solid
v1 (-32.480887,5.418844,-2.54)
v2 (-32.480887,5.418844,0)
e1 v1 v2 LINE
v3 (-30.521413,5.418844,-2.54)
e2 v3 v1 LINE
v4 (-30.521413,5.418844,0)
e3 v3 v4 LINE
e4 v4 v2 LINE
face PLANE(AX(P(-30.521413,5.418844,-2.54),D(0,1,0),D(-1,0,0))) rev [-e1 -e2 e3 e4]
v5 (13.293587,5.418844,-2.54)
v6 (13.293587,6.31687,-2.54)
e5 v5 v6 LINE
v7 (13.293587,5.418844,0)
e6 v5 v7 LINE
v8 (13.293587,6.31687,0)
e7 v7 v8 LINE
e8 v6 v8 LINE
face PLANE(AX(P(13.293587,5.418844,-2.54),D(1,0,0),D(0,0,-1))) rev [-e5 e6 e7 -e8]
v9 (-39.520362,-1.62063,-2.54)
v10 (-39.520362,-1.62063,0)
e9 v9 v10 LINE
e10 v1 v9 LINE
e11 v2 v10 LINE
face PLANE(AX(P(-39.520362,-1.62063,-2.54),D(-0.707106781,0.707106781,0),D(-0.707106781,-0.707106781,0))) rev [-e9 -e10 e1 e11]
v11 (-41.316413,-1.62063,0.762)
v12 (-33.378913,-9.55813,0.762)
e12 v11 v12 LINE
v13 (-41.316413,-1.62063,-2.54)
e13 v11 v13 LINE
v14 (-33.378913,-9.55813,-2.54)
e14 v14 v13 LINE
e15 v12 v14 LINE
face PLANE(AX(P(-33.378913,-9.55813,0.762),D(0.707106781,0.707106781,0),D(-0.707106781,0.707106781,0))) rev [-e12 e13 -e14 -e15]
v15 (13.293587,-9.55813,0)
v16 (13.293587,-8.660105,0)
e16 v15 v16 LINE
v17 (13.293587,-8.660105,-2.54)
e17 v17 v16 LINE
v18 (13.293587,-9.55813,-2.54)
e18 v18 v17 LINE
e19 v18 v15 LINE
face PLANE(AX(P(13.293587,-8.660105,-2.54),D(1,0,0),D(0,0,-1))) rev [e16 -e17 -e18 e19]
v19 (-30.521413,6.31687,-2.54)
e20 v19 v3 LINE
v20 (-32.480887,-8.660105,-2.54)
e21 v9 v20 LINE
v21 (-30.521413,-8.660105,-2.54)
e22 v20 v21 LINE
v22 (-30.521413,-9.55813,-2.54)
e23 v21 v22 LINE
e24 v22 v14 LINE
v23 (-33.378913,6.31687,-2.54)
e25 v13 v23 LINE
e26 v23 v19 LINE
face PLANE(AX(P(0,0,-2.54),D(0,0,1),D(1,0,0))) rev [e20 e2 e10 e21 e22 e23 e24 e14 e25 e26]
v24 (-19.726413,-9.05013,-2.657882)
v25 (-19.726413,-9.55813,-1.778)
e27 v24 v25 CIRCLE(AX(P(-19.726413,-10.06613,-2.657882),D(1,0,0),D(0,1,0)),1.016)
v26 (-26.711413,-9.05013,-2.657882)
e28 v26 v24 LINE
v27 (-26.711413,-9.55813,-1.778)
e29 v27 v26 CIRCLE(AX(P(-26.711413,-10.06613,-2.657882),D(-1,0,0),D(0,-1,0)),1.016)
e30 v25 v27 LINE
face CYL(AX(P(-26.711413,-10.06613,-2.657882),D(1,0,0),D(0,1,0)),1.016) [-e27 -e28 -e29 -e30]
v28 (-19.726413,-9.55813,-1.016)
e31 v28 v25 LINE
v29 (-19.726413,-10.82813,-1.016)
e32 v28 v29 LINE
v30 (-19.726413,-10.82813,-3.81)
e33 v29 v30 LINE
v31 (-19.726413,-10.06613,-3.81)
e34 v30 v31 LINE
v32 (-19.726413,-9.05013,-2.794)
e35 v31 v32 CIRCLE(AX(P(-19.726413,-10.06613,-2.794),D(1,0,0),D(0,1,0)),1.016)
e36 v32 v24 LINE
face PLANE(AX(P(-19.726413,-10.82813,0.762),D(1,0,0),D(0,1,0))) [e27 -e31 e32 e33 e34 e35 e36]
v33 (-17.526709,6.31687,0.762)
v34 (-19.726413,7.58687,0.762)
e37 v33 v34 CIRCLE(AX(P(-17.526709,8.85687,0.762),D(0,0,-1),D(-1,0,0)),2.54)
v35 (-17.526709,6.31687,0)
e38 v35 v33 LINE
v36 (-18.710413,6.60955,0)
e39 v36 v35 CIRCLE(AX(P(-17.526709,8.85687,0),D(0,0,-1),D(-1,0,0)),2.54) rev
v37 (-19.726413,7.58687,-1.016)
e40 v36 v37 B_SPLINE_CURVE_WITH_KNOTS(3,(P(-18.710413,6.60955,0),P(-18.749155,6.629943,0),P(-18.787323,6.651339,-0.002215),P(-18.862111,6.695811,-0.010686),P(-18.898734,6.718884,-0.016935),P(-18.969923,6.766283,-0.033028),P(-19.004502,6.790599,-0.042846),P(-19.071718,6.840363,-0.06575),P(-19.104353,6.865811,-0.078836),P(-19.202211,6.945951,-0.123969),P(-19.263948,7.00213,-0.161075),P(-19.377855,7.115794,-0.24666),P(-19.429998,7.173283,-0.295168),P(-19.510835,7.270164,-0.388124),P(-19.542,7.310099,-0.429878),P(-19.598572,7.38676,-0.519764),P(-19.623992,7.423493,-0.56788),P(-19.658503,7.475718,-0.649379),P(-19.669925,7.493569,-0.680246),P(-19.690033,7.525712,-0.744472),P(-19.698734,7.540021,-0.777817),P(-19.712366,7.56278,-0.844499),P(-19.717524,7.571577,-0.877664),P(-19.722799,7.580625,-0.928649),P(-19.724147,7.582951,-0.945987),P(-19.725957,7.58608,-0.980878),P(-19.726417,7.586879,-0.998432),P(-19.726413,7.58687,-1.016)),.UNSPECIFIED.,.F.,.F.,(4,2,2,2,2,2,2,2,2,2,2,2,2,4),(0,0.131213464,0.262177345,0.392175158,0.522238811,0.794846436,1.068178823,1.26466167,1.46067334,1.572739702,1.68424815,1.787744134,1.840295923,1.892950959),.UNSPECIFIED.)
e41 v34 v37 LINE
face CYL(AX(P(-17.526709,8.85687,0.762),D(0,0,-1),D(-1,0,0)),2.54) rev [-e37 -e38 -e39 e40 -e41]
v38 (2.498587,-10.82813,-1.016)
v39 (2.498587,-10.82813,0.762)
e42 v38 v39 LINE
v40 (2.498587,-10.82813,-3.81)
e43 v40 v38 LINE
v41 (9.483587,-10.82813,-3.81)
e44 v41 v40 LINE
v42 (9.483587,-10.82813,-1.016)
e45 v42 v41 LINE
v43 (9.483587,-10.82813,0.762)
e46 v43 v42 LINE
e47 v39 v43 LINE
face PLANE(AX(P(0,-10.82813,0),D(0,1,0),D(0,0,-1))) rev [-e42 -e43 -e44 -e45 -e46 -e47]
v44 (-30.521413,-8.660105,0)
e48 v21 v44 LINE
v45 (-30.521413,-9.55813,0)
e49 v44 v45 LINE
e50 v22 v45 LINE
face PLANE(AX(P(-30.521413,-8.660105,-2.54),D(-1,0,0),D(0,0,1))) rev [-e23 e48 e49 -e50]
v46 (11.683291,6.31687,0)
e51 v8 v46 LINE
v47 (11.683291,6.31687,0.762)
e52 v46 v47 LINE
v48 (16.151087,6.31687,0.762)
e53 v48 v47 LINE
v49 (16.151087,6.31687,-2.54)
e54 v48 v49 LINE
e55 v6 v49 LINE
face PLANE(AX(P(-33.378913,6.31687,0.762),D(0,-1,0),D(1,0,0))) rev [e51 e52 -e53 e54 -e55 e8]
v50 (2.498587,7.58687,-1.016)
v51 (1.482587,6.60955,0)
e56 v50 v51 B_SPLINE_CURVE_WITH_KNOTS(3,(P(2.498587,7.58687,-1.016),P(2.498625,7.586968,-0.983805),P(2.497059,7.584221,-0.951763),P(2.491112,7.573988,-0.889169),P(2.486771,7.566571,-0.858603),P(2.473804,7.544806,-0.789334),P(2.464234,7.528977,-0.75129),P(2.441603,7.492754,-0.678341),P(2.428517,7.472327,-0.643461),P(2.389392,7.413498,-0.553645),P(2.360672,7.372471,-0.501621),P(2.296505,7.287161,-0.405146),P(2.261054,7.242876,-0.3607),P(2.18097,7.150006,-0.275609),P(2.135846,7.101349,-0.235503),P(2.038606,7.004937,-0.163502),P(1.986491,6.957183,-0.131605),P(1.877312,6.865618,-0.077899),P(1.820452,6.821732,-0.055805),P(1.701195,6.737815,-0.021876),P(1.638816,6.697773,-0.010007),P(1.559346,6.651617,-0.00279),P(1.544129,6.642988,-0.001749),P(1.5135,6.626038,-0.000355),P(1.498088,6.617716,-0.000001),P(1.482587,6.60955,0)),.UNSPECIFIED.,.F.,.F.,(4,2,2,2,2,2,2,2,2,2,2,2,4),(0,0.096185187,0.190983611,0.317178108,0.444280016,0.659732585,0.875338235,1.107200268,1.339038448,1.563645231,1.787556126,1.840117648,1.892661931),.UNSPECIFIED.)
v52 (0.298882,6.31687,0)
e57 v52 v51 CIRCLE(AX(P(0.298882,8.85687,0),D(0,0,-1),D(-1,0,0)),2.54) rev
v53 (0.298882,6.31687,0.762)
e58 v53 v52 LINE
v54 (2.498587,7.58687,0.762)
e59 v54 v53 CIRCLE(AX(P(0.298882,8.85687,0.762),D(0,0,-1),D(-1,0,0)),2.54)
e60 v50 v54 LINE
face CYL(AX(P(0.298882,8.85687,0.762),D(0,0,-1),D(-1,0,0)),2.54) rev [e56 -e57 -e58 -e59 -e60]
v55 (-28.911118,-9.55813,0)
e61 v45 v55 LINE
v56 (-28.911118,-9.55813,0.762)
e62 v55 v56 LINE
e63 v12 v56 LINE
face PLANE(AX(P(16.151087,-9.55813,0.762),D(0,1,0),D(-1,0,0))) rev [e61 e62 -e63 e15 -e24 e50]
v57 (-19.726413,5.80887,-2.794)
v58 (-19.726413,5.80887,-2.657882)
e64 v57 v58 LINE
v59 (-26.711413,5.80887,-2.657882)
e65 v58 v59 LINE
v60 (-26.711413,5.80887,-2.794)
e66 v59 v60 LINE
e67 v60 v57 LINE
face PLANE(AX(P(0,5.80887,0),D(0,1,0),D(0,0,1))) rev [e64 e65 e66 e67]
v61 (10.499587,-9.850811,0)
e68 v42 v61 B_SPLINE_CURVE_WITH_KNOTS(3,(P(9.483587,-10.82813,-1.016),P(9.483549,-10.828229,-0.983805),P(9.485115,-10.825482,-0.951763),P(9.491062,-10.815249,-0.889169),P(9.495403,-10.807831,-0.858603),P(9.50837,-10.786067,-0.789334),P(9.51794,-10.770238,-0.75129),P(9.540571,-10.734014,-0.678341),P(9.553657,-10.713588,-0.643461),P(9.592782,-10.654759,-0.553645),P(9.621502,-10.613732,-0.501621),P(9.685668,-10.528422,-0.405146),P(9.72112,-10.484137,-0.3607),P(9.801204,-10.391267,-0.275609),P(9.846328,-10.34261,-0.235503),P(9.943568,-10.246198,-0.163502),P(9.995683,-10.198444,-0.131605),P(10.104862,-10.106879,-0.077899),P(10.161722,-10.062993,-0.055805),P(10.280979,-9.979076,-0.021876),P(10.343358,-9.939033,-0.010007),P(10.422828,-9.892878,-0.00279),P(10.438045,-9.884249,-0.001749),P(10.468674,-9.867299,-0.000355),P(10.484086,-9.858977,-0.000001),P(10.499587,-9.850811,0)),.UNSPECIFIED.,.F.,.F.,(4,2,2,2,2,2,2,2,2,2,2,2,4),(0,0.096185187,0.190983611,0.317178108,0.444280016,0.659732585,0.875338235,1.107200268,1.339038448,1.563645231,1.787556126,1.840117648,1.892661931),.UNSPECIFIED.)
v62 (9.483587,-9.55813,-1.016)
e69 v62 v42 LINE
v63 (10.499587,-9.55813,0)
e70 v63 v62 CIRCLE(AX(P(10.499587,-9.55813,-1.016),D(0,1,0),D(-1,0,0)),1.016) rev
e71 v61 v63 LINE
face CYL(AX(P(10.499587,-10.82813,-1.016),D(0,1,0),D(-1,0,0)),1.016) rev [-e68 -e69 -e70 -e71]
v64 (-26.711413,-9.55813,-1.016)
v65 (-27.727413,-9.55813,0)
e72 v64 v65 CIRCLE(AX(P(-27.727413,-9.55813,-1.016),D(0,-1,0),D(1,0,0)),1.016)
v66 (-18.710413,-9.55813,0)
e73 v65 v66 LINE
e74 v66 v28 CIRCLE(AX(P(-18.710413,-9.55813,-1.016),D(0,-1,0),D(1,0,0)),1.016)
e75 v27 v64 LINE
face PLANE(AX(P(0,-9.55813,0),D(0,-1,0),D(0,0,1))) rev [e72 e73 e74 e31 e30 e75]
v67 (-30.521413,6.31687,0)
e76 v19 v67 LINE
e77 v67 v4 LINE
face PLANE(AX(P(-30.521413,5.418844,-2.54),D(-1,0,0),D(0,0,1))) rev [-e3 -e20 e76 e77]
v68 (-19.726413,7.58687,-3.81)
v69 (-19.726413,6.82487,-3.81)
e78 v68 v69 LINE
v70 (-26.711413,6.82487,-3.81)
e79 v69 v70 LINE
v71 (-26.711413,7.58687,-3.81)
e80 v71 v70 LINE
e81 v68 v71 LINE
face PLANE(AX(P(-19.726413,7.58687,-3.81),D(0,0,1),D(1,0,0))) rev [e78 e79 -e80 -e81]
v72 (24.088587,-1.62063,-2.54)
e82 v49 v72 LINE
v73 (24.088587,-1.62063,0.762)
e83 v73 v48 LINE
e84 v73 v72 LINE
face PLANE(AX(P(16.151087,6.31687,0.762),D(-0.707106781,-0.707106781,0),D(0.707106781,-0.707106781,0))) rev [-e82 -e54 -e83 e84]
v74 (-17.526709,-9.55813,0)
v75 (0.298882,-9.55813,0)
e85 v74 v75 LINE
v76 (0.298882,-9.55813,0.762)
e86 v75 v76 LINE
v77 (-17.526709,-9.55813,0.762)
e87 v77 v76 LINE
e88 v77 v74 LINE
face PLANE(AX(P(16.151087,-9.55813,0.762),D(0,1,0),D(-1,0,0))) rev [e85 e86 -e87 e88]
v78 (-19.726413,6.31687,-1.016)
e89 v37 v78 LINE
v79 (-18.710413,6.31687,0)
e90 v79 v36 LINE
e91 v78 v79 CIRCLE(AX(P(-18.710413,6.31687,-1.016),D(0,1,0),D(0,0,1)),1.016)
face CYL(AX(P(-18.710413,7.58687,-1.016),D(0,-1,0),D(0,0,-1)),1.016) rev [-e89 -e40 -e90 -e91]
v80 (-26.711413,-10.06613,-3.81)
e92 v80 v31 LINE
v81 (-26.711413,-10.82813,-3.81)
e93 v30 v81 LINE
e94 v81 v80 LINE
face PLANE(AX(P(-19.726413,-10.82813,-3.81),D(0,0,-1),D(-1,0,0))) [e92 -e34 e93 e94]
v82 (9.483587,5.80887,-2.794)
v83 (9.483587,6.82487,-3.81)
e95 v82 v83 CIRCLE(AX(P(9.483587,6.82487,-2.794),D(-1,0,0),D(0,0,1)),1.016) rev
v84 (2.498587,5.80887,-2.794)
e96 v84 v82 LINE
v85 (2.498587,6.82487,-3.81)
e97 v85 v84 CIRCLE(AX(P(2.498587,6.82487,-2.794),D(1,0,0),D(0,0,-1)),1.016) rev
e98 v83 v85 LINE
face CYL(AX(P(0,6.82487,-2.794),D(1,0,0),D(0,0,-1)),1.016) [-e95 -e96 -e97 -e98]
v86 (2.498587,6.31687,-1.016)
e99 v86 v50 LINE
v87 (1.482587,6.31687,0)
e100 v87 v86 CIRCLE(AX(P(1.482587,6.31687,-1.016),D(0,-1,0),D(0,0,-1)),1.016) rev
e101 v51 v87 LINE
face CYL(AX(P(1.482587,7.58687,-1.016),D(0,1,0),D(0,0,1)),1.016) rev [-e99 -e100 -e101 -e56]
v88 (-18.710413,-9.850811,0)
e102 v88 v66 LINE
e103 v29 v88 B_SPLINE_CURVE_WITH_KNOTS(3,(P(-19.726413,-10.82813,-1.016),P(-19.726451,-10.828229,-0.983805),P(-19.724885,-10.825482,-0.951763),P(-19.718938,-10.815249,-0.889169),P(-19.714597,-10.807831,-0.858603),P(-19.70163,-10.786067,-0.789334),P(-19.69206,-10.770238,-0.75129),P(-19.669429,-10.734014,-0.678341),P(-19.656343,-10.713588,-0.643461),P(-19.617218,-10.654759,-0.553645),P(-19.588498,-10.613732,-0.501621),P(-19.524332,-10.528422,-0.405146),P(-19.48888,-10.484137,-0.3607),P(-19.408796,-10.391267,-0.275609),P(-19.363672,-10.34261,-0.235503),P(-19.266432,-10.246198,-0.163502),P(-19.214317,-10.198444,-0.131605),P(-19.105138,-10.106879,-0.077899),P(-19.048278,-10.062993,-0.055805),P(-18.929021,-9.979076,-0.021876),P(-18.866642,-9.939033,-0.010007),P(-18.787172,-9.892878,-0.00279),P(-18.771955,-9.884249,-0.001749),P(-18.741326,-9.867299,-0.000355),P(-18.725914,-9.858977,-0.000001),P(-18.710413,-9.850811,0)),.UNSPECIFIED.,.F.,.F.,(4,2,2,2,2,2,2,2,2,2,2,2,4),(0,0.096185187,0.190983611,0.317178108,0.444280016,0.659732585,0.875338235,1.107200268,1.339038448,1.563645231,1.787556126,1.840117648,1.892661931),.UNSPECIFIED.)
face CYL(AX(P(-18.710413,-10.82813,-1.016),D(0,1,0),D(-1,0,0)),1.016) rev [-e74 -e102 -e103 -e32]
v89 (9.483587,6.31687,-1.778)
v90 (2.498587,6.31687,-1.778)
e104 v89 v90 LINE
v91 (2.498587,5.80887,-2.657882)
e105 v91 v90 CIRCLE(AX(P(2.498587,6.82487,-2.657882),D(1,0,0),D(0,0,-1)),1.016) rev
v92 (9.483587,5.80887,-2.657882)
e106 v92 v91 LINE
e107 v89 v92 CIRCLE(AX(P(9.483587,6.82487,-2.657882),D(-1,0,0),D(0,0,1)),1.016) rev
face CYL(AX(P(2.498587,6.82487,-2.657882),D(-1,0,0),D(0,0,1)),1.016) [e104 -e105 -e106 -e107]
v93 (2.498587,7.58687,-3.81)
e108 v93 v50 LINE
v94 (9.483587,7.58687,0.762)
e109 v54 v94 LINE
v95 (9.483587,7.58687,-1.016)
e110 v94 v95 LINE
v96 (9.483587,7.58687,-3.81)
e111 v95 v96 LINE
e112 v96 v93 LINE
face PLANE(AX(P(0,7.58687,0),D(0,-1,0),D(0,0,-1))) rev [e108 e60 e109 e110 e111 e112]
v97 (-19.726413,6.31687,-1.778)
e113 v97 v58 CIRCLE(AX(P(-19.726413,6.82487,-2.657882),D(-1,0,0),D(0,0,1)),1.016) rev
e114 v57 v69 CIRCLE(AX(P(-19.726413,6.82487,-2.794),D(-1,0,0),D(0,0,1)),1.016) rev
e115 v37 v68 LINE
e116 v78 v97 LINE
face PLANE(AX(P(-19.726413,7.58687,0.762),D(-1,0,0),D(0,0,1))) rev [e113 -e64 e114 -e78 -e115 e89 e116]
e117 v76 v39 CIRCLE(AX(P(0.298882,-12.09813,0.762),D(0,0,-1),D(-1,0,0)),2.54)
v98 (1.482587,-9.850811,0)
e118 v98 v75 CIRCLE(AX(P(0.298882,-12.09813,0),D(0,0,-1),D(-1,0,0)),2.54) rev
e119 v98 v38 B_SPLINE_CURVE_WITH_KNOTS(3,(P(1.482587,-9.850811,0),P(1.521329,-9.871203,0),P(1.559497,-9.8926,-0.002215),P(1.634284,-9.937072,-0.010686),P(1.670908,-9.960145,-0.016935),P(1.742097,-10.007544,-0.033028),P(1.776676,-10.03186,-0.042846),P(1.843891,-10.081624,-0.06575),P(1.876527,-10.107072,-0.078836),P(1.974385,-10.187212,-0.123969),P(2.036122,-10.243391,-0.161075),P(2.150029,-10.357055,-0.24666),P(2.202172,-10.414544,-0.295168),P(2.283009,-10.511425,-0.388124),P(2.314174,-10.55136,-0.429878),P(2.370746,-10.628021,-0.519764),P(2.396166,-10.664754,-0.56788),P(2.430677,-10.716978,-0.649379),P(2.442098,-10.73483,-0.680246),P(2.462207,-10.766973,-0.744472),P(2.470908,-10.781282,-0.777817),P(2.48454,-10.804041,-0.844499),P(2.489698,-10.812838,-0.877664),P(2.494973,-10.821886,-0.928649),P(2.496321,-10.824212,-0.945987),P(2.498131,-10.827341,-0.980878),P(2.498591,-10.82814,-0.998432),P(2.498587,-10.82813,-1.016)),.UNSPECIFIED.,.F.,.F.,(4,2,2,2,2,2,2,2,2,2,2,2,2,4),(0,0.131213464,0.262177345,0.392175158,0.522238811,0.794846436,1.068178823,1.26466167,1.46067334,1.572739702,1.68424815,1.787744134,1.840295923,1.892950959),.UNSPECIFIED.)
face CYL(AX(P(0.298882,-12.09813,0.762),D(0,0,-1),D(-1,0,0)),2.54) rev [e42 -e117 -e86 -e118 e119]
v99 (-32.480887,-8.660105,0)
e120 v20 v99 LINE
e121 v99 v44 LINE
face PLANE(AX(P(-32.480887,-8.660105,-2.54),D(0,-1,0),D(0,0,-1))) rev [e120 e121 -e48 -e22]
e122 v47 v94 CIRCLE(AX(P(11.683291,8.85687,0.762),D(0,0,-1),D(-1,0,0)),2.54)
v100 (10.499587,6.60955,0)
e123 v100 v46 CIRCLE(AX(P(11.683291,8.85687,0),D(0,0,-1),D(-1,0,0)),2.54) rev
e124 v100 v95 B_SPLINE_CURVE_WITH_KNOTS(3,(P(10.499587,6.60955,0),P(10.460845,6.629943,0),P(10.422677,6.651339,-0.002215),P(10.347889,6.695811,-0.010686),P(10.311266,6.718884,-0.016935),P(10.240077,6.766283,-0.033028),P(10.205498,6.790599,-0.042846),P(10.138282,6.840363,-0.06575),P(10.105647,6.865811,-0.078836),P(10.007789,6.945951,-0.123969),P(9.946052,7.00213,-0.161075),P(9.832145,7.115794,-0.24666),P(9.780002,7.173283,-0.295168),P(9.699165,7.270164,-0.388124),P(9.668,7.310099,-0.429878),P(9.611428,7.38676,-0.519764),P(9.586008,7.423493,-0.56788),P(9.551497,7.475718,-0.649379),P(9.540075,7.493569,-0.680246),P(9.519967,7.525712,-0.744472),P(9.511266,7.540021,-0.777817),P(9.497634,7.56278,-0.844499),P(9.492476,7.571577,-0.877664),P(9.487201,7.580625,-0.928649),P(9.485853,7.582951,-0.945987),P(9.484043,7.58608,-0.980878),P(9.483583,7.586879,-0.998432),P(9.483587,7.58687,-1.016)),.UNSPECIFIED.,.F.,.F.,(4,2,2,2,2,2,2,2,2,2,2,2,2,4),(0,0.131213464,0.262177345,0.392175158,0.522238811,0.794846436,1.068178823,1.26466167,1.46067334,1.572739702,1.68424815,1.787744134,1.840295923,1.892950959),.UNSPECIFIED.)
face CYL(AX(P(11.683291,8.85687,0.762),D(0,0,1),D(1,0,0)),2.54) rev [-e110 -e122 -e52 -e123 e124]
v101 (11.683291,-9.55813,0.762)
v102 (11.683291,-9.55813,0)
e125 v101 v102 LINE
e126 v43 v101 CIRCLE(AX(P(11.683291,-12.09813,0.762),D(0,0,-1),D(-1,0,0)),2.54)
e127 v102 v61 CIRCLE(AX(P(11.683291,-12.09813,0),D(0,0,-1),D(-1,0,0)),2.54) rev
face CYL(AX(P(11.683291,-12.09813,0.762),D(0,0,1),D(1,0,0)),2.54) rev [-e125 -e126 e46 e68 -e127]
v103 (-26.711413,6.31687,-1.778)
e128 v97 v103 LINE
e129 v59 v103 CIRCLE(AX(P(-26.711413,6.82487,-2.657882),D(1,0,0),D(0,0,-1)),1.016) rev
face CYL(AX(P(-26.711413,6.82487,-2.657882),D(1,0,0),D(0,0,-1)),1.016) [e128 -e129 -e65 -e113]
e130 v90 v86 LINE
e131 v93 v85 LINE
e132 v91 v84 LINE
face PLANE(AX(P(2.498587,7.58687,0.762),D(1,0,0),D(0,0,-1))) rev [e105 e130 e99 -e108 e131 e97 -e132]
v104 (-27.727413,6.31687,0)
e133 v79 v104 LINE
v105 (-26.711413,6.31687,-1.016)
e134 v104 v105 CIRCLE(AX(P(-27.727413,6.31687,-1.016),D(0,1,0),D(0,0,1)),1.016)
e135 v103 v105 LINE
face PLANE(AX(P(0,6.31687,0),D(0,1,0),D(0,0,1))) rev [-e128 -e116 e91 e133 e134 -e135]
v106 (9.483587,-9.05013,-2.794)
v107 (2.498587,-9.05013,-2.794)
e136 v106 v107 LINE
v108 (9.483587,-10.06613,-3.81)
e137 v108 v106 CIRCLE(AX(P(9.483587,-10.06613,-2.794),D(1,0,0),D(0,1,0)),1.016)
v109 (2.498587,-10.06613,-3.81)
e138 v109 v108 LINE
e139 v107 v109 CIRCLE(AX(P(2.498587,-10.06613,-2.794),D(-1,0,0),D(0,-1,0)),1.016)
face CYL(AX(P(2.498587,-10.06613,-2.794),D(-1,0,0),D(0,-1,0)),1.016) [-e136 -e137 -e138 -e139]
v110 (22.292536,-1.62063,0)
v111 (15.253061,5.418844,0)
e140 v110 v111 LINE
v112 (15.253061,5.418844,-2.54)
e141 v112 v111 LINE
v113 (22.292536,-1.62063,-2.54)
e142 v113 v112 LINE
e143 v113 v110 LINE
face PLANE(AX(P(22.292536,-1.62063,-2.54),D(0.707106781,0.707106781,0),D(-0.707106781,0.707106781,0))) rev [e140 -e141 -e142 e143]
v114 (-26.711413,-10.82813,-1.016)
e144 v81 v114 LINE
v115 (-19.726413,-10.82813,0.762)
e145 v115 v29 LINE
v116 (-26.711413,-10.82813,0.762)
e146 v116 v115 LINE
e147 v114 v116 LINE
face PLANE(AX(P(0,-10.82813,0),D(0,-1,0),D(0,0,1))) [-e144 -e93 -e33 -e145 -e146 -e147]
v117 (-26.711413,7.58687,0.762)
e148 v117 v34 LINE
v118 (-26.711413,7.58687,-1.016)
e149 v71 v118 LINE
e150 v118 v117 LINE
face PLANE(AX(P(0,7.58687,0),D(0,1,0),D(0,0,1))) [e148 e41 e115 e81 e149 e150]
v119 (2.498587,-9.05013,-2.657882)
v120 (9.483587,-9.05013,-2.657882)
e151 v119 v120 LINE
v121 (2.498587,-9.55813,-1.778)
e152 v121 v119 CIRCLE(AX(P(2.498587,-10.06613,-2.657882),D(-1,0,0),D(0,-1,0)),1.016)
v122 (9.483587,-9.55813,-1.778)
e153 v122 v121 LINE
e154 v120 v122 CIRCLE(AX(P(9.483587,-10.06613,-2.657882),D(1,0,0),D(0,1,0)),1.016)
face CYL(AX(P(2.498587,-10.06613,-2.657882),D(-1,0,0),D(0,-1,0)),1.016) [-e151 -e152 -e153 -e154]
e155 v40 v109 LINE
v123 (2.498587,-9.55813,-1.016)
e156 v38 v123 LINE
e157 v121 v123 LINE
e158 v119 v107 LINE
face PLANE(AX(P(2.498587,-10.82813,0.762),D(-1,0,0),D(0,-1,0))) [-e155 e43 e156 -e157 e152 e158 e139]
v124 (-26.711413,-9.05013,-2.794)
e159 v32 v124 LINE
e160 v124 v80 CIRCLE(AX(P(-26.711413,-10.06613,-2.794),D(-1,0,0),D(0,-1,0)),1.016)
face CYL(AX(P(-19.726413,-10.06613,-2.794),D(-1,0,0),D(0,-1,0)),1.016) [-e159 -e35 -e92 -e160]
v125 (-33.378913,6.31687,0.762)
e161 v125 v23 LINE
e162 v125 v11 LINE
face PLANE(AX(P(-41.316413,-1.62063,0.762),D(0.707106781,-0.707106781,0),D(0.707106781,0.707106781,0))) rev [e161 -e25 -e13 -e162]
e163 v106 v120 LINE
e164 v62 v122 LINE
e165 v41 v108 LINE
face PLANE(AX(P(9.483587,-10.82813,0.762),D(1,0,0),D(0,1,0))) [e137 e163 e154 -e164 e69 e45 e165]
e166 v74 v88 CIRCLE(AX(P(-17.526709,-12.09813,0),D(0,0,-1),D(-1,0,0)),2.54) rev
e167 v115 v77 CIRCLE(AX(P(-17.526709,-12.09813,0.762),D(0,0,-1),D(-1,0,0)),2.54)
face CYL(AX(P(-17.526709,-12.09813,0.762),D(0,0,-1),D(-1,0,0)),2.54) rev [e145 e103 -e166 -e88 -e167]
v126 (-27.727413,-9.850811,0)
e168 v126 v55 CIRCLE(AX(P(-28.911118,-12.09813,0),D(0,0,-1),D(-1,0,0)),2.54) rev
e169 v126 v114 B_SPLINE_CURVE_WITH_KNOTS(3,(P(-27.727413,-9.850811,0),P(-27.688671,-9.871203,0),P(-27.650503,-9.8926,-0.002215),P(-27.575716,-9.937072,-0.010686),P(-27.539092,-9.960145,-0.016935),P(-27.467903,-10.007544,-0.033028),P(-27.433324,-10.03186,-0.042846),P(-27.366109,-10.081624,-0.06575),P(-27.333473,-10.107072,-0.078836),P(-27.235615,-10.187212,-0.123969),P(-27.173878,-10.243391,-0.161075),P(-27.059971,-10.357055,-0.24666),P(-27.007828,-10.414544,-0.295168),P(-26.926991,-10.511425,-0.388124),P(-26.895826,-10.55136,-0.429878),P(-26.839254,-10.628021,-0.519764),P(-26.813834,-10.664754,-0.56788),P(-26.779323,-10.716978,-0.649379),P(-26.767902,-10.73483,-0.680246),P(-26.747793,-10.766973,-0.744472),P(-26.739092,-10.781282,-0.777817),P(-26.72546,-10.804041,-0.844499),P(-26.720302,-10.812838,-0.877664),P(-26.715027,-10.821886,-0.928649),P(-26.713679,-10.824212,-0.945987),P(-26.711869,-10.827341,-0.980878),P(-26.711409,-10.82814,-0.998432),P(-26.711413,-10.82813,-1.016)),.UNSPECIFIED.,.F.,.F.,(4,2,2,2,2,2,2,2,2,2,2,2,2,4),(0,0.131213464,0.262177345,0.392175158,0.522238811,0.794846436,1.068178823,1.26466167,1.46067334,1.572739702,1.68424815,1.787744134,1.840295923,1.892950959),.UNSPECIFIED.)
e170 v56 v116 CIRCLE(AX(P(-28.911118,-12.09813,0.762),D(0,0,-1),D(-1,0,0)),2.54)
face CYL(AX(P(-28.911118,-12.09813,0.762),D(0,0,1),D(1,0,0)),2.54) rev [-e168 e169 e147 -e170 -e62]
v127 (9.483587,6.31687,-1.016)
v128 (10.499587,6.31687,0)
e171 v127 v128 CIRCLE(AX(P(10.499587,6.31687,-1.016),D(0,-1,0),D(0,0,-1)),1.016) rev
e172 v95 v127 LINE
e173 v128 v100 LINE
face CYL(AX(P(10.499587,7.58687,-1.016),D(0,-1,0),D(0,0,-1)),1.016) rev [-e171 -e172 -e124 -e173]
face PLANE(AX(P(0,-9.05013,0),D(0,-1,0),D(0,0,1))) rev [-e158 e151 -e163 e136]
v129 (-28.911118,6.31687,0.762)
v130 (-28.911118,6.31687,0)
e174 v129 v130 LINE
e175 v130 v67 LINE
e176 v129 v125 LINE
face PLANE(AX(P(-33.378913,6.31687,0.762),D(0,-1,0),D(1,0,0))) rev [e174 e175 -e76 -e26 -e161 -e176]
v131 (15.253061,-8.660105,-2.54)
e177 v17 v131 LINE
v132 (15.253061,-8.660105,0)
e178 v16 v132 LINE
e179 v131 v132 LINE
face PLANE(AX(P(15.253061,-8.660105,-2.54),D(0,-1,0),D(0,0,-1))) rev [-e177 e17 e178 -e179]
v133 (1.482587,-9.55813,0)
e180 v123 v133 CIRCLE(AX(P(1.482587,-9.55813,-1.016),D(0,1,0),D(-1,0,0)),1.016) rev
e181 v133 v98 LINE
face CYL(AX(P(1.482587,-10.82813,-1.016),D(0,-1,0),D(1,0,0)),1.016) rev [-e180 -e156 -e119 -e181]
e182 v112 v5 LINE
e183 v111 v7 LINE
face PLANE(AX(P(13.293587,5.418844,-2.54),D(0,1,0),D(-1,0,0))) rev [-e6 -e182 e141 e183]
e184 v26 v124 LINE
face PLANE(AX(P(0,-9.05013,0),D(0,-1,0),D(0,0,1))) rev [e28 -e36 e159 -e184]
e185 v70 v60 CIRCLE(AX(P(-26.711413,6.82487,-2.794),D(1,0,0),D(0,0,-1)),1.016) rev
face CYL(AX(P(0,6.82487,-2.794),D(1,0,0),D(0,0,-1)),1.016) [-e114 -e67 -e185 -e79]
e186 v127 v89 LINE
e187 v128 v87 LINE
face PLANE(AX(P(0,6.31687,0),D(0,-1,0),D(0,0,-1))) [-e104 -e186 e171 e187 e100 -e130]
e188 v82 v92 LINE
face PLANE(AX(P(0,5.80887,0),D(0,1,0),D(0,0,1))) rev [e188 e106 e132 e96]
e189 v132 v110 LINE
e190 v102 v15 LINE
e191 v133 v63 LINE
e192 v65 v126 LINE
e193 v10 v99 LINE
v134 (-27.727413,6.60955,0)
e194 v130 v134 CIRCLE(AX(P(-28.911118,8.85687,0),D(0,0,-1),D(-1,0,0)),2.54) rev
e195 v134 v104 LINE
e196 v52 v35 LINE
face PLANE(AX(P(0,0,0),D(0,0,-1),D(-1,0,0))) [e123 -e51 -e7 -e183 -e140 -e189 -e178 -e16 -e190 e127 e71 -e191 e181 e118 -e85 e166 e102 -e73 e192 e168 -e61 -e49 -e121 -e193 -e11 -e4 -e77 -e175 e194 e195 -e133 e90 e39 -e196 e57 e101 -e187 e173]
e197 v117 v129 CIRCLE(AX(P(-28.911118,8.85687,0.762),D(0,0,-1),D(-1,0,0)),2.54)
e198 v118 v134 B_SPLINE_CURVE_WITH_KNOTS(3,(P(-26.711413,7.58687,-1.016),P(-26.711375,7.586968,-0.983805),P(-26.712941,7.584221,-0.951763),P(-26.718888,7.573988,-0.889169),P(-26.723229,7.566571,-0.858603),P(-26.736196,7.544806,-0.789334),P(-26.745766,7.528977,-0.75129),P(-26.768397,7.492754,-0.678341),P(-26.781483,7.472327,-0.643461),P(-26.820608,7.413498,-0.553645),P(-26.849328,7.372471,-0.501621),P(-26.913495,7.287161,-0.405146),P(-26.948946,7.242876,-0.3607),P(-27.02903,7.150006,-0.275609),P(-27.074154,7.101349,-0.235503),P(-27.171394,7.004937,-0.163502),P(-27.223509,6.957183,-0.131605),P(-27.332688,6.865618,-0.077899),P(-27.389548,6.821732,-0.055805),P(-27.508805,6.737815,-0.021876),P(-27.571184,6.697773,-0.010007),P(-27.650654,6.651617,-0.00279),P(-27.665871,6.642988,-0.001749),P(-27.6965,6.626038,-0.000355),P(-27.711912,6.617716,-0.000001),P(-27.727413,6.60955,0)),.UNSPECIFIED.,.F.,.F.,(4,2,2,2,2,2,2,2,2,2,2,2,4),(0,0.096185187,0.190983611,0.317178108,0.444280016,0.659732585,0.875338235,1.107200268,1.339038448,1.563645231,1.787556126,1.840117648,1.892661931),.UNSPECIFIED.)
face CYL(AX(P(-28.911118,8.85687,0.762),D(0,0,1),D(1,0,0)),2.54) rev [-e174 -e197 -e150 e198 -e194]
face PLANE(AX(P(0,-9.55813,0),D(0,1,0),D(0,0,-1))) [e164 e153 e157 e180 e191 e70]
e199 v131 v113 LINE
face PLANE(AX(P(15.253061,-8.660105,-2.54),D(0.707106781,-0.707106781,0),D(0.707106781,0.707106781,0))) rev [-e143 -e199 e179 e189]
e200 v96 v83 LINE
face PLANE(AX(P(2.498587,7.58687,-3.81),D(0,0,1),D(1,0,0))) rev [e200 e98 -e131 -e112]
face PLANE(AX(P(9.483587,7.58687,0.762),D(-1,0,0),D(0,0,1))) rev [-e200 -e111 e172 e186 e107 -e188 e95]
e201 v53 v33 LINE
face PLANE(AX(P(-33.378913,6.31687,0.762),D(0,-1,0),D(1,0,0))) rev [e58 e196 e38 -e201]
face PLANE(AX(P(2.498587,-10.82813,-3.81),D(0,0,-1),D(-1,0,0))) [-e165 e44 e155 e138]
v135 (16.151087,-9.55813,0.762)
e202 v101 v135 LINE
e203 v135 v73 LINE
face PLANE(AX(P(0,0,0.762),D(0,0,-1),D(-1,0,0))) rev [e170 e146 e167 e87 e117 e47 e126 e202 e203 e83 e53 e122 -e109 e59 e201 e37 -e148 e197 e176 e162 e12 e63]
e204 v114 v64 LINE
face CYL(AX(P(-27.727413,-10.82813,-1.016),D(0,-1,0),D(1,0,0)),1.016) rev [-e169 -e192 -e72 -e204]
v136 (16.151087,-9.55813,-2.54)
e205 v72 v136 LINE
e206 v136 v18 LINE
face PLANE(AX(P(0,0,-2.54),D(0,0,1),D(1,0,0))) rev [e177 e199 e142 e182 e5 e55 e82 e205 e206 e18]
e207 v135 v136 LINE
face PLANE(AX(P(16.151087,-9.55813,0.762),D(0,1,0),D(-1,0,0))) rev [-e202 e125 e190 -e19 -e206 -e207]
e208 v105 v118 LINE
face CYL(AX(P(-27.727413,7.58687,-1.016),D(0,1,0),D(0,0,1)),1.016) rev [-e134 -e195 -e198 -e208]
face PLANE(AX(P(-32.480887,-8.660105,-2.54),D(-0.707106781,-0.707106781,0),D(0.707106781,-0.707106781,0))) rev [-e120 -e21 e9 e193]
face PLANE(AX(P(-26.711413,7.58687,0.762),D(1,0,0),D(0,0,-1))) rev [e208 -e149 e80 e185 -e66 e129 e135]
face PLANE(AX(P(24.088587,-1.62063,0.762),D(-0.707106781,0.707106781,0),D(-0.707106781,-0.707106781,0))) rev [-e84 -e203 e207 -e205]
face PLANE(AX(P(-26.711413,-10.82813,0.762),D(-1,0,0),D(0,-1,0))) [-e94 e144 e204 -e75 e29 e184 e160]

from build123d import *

# Parameters (mm, degrees)
BOSS_EXTRUDE1_DEPTH  = 0.762
BOSS_EXTRUDE2_DEPTH  = 2.54
SKETCH4_W            = 6.985
SKETCH4_H            = 4.572
BOSS_EXTRUDE3_DEPTH  = 1.27
FILLET1_R            = 2.54
SKETCH5_W            = 6.985
SKETCH5_H            = 2.032
BOSS_EXTRUDE4_DEPTH  = 0.508
FILLET2_R            = 1.016
FILLET3_R            = 1.016
FILLET2_OF_MIRROR4_R = 1.016
FILLET4_R            = 2.54
FILLET5_R            = 1.016


with BuildPart() as part:
    # Sketch1 → Boss-Extrude1 (new body)
    with BuildSketch(Plane.XY):
        Polygon((-33.378913043, 6.316869565), (16.151086957, 6.316869565), (24.088586957, -1.620630435), (16.151086957, -9.558130435), (-33.378913043, -9.558130435), (-41.316413043, -1.620630435), align=None)
    extrude(amount=BOSS_EXTRUDE1_DEPTH)

    # Sketch2 → Boss-Extrude2 (add)
    with BuildSketch(Plane(origin=(0, 0, 0), x_dir=(-1, 0, 0), z_dir=(0, 0, -1))):
        Polygon((30.521413043, 6.316869565), (33.378913043, 6.316869565), (41.316413043, -1.620630435), (33.378913043, -9.558130435), (30.521413043, -9.558130435), (30.521413043, -8.660104823), (32.480887431, -8.660104823), (39.520361819, -1.620630435), (32.480887431, 5.418843953), (30.521413043, 5.418843953), align=None)
        Polygon((-16.151086957, -9.558130435), (-24.088586957, -1.620630435), (-16.151086957, 6.316869565), (-13.293586957, 6.316869565), (-13.293586957, 5.418843953), (-15.253061344, 5.418843953), (-22.292535732, -1.620630435), (-15.253061344, -8.660104823), (-13.293586957, -8.660104823), (-13.293586957, -9.558130435), align=None)
    extrude(amount=BOSS_EXTRUDE2_DEPTH)

    # Sketch4 → Boss-Extrude3 (add)
    with BuildSketch(Plane(origin=(0, 6.316869565, 0), x_dir=(1, 0, 0), z_dir=(0, 1, 0))):
        with Locations((5.991086957, 1.524)):
            Rectangle(SKETCH4_W, SKETCH4_H)
        with Locations((-23.218913043, 1.524)):
            Rectangle(SKETCH4_W, SKETCH4_H)
    boss_extrude3 = extrude(amount=BOSS_EXTRUDE3_DEPTH)

    # Fillet1
    # the kernel refuses this fillet: 2.54 mm, written as the material it adds along each edge
    with BuildSketch(Plane(origin=(-26.711413043, 6.316869565, 0.762), x_dir=(-1, 0, 0), z_dir=(0, 0, -1)), Plane(origin=(-19.726413043, 6.316869565, 0), x_dir=(1, 0, 0), z_dir=(0, 0, 1)), Plane(origin=(2.498586957, 6.316869565, 0.762), x_dir=(-1, 0, 0), z_dir=(0, 0, -1)), Plane(origin=(9.483586957, 6.316869565, 0), x_dir=(1, 0, 0), z_dir=(0, 0, 1))) as fillet1_piece_1:
        with BuildLine():
            CenterArc((2.199704526, 2.54), FILLET1_R, 210, 60)
            Line((0, 1.27), (0, 0))
            Line((0, 0), (2.199704526, 0))
        make_face()
    extrude(amount=0.762)

    # Sketch5 → Boss-Extrude4 (add)
    with BuildSketch(Plane.XZ.offset(-6.316869565)):
        with Locations((5.991086957, -2.794)):
            Rectangle(SKETCH5_W, SKETCH5_H)
        with Locations((-23.218913043, -2.794)):
            Rectangle(SKETCH5_W, SKETCH5_H)
    boss_extrude4 = extrude(amount=BOSS_EXTRUDE4_DEPTH)

    # Fillet2
    # the kernel refuses this fillet: 1.016 mm, written as the material it takes off along each edge
    with BuildSketch(Plane(origin=(-0.041413043, 5.808869565, -3.81), x_dir=(0, 1, 0), z_dir=(1, 0, 0))) as fillet2_piece_1:
        with BuildLine():
            CenterArc((FILLET2_R, FILLET2_R), FILLET2_R, 180, 90)
            Line((0, FILLET2_R), (-FILLET2_R * 0.02, FILLET2_R))
            Line((-FILLET2_R * 0.02, FILLET2_R), (-FILLET2_R * 0.02, -FILLET2_R * 0.02))
            Line((-FILLET2_R * 0.02, -FILLET2_R * 0.02), (FILLET2_R, -FILLET2_R * 0.02))
            Line((FILLET2_R, -FILLET2_R * 0.02), (FILLET2_R, 0))
        make_face()
    extrude(amount=12.065, mode=Mode.SUBTRACT)
    with BuildSketch(Plane(origin=(11.683291482, 5.808869565, -1.778), x_dir=(0, 0, -1), z_dir=(-1, 0, 0))) as fillet2_piece_2:
        with BuildLine():
            CenterArc((0.87988181, -1.016), FILLET2_R, 90, 60)
            Line((0, -0.508), (-0.017597636, -0.49784))
            ThreePointArc((-0.017597636, -0.49784), (-0.02032, -0.254), (-0.02032, 0))
            Line((-0.02032, 0), (0, 0.02032))
            Line((0, 0.02032), (0.87988181, 0.02032))
            Line((0.87988181, 0.02032), (0.87988181, 0))
        make_face()
    extrude(amount=11.384409051, mode=Mode.SUBTRACT)
    with BuildSketch(Plane(origin=(-29.251413043, 5.808869565, -3.81), x_dir=(0, 0, 1), z_dir=(1, 0, 0))) as fillet2_piece_3:
        with BuildLine():
            CenterArc((FILLET2_R, -FILLET2_R), FILLET2_R, 90, 90)
            Line((0, -FILLET2_R), (-FILLET2_R * 0.02, -FILLET2_R))
            Line((-FILLET2_R * 0.02, -FILLET2_R), (-FILLET2_R * 0.02, FILLET2_R * 0.02))
            Line((-FILLET2_R * 0.02, FILLET2_R * 0.02), (FILLET2_R, FILLET2_R * 0.02))
            Line((FILLET2_R, FILLET2_R * 0.02), (FILLET2_R, 0))
        make_face()
    extrude(amount=12.065, mode=Mode.SUBTRACT)
    with BuildSketch(Plane(origin=(-17.526708518, 5.808869565, -1.778), x_dir=(0, 1, 0), z_dir=(-1, 0, 0))) as fillet2_piece_4:
        with BuildLine():
            CenterArc((1.016, 0.87988181), FILLET2_R, 180, 60)
            Line((0, 0.87988181), (-0.02032, 0.87988181))
            Line((-0.02032, 0.87988181), (-0.02032, 0))
            Line((-0.02032, 0), (0, -0.02032))
            ThreePointArc((0, -0.02032), (0.254, -0.02032), (0.49784, -0.017597636))
            Line((0.49784, -0.017597636), (0.508, 0))
        make_face()
    extrude(amount=11.384409051, mode=Mode.SUBTRACT)

    # Fillet3
    # the kernel refuses this fillet: 1.016 mm, written as the material it adds along each edge
    with BuildSketch(Plane(origin=(-26.711413043, 10.126869565, 0), x_dir=(-1, 0, 0), z_dir=(0, -1, 0))) as fillet3_piece_1_section:
        with BuildLine():
            CenterArc((FILLET3_R, FILLET3_R), FILLET3_R, 180, 90)
            Line((0, FILLET3_R), (0, 0))
            Line((0, 0), (FILLET3_R, 0))
        make_face()
    fillet3_piece_1 = extrude(amount=3.81, mode=Mode.PRIVATE)
    fillet3_piece_1 = fillet3_piece_1 - Plane(origin=(-28.911117569, 8.856869565, 0), x_dir=(-1, 0, 0), z_dir=(0, 0, 1)) * Cylinder(2.54, 12, mode=Mode.PRIVATE)
    add(fillet3_piece_1)
    with BuildSketch(Plane(origin=(-19.726413043, 10.126869565, 0), x_dir=(1, 0, 0), z_dir=(0, -1, 0))) as fillet3_piece_2_section:
        with BuildLine():
            CenterArc((FILLET3_R, -FILLET3_R), FILLET3_R, 90, 90)
            Line((0, -FILLET3_R), (0, 0))
            Line((0, 0), (FILLET3_R, 0))
        make_face()
    fillet3_piece_2 = extrude(amount=3.81, mode=Mode.PRIVATE)
    fillet3_piece_2 = fillet3_piece_2 - Plane(origin=(-17.526708518, 8.856869565, 0), x_dir=(1, 0, 0), z_dir=(0, 0, -1)) * Cylinder(2.54, 12, mode=Mode.PRIVATE)
    add(fillet3_piece_2)
    with BuildSketch(Plane(origin=(2.498586957, 10.126869565, 0), x_dir=(-1, 0, 0), z_dir=(0, -1, 0))) as fillet3_piece_3_section:
        with BuildLine():
            CenterArc((FILLET3_R, FILLET3_R), FILLET3_R, 180, 90)
            Line((0, FILLET3_R), (0, 0))
            Line((0, 0), (FILLET3_R, 0))
        make_face()
    fillet3_piece_3 = extrude(amount=3.81, mode=Mode.PRIVATE)
    fillet3_piece_3 = fillet3_piece_3 - Plane(origin=(0.298882431, 8.856869565, 0), x_dir=(-1, 0, 0), z_dir=(0, 0, 1)) * Cylinder(2.54, 12, mode=Mode.PRIVATE)
    add(fillet3_piece_3)
    with BuildSketch(Plane(origin=(9.483586957, 10.126869565, 0), x_dir=(1, 0, 0), z_dir=(0, -1, 0))) as fillet3_piece_4_section:
        with BuildLine():
            CenterArc((FILLET3_R, -FILLET3_R), FILLET3_R, 90, 90)
            Line((0, -FILLET3_R), (0, 0))
            Line((0, 0), (FILLET3_R, 0))
        make_face()
    fillet3_piece_4 = extrude(amount=3.81, mode=Mode.PRIVATE)
    fillet3_piece_4 = fillet3_piece_4 - Plane(origin=(11.683291482, 8.856869565, 0), x_dir=(1, 0, 0), z_dir=(0, 0, -1)) * Cylinder(2.54, 12, mode=Mode.PRIVATE)
    add(fillet3_piece_4)

    # Mirror4: Boss-Extrude3, Boss-Extrude4 across plane
    add(boss_extrude3.mirror(Plane.ZX.offset(-1.620630435)))
    add(boss_extrude4.mirror(Plane.ZX.offset(-1.620630435)))

    # Fillet2 of Mirror4
    # the kernel refuses this fillet: 1.016 mm, written as the material it takes off along each edge
    with BuildSketch(Plane(origin=(-0.041413043, -9.050130435, -3.81), x_dir=(0, 0, 1), z_dir=(1, 0, 0)), Plane(origin=(-29.251413043, -9.050130435, -3.81), x_dir=(0, 0, 1), z_dir=(1, 0, 0))) as fillet2_of_mirror4_piece_1:
        with BuildLine():
            CenterArc((FILLET2_OF_MIRROR4_R, FILLET2_OF_MIRROR4_R), FILLET2_OF_MIRROR4_R, 180, 90)
            Line((0, FILLET2_OF_MIRROR4_R), (-FILLET2_OF_MIRROR4_R * 0.02, FILLET2_OF_MIRROR4_R))
            Line((-FILLET2_OF_MIRROR4_R * 0.02, FILLET2_OF_MIRROR4_R), (-FILLET2_OF_MIRROR4_R * 0.02, -FILLET2_OF_MIRROR4_R * 0.02))
            Line((-FILLET2_OF_MIRROR4_R * 0.02, -FILLET2_OF_MIRROR4_R * 0.02), (FILLET2_OF_MIRROR4_R, -FILLET2_OF_MIRROR4_R * 0.02))
            Line((FILLET2_OF_MIRROR4_R, -FILLET2_OF_MIRROR4_R * 0.02), (FILLET2_OF_MIRROR4_R, 0))
        make_face()
    extrude(amount=12.065, mode=Mode.SUBTRACT)
    with BuildSketch(Plane(origin=(11.683291482, -9.050130435, -1.778), x_dir=(0, 0, -1), z_dir=(-1, 0, 0)), Plane(origin=(-17.526708518, -9.050130435, -1.778), x_dir=(0, 0, -1), z_dir=(-1, 0, 0))) as fillet2_of_mirror4_piece_2:
        with BuildLine():
            CenterArc((0.87988181, 1.016), FILLET2_OF_MIRROR4_R, 210, 60)
            Line((0, 0.508), (-0.017597636, 0.49784))
            ThreePointArc((-0.017597636, 0.49784), (-0.02032, 0.254), (-0.02032, 0))
            Line((-0.02032, 0), (0, -0.02032))
            Line((0, -0.02032), (0.87988181, -0.02032))
            Line((0.87988181, -0.02032), (0.87988181, 0))
        make_face()
    extrude(amount=11.384409051, mode=Mode.SUBTRACT)

    # Fillet4
    # the kernel refuses this fillet: 2.54 mm, written as the material it adds along each edge
    with BuildSketch(Plane(origin=(-26.711413043, -9.558130435, 0.762), x_dir=(-1, 0, 0), z_dir=(0, 0, -1)), Plane(origin=(-19.726413043, -9.558130435, 0), x_dir=(1, 0, 0), z_dir=(0, 0, 1)), Plane(origin=(2.498586957, -9.558130435, 0.762), x_dir=(-1, 0, 0), z_dir=(0, 0, -1)), Plane(origin=(9.483586957, -9.558130435, 0), x_dir=(1, 0, 0), z_dir=(0, 0, 1))) as fillet4_piece_1:
        with BuildLine():
            CenterArc((2.199704526, -2.54), FILLET4_R, 90, 60)
            Line((0, -1.27), (0, 0))
            Line((0, 0), (2.199704526, 0))
        make_face()
    extrude(amount=0.762)

    # Fillet5
    # the kernel refuses this fillet: 1.016 mm, written as the material it adds along each edge
    with BuildSketch(Plane(origin=(-26.711413043, -13.368130435, 0), x_dir=(-1, 0, 0), z_dir=(0, 1, 0))) as fillet5_piece_1_section:
        with BuildLine():
            CenterArc((FILLET5_R, -FILLET5_R), FILLET5_R, 90, 90)
            Line((0, -FILLET5_R), (0, 0))
            Line((0, 0), (FILLET5_R, 0))
        make_face()
    fillet5_piece_1 = extrude(amount=3.81, mode=Mode.PRIVATE)
    fillet5_piece_1 = fillet5_piece_1 - Plane(origin=(-28.911117569, -12.098130435, 0), x_dir=(-1, 0, 0), z_dir=(0, 0, 1)) * Cylinder(2.54, 12, mode=Mode.PRIVATE)
    add(fillet5_piece_1)
    with BuildSketch(Plane(origin=(9.483586957, -13.368130435, 0), x_dir=(1, 0, 0), z_dir=(0, 1, 0))) as fillet5_piece_2_section:
        with BuildLine():
            CenterArc((FILLET5_R, FILLET5_R), FILLET5_R, 180, 90)
            Line((0, FILLET5_R), (0, 0))
            Line((0, 0), (FILLET5_R, 0))
        make_face()
    fillet5_piece_2 = extrude(amount=3.81, mode=Mode.PRIVATE)
    fillet5_piece_2 = fillet5_piece_2 - Plane(origin=(11.683291482, -12.098130435, 0), x_dir=(1, 0, 0), z_dir=(0, 0, -1)) * Cylinder(2.54, 12, mode=Mode.PRIVATE)
    add(fillet5_piece_2)
    with BuildSketch(Plane(origin=(-19.726413043, -13.368130435, 0), x_dir=(1, 0, 0), z_dir=(0, 1, 0))) as fillet5_piece_3_section:
        with BuildLine():
            CenterArc((FILLET5_R, FILLET5_R), FILLET5_R, 180, 90)
            Line((0, FILLET5_R), (0, 0))
            Line((0, 0), (FILLET5_R, 0))
        make_face()
    fillet5_piece_3 = extrude(amount=3.81, mode=Mode.PRIVATE)
    fillet5_piece_3 = fillet5_piece_3 - Plane(origin=(-17.526708518, -12.098130435, 0), x_dir=(1, 0, 0), z_dir=(0, 0, -1)) * Cylinder(2.54, 12, mode=Mode.PRIVATE)
    add(fillet5_piece_3)
    with BuildSketch(Plane(origin=(2.498586957, -13.368130435, 0), x_dir=(-1, 0, 0), z_dir=(0, 1, 0))) as fillet5_piece_4_section:
        with BuildLine():
            CenterArc((FILLET5_R, -FILLET5_R), FILLET5_R, 90, 90)
            Line((0, -FILLET5_R), (0, 0))
            Line((0, 0), (FILLET5_R, 0))
        make_face()
    fillet5_piece_4 = extrude(amount=3.81, mode=Mode.PRIVATE)
    fillet5_piece_4 = fillet5_piece_4 - Plane(origin=(0.298882431, -12.098130435, 0), x_dir=(-1, 0, 0), z_dir=(0, 0, 1)) * Cylinder(2.54, 12, mode=Mode.PRIVATE)
    add(fillet5_piece_4)


solid = part.part
